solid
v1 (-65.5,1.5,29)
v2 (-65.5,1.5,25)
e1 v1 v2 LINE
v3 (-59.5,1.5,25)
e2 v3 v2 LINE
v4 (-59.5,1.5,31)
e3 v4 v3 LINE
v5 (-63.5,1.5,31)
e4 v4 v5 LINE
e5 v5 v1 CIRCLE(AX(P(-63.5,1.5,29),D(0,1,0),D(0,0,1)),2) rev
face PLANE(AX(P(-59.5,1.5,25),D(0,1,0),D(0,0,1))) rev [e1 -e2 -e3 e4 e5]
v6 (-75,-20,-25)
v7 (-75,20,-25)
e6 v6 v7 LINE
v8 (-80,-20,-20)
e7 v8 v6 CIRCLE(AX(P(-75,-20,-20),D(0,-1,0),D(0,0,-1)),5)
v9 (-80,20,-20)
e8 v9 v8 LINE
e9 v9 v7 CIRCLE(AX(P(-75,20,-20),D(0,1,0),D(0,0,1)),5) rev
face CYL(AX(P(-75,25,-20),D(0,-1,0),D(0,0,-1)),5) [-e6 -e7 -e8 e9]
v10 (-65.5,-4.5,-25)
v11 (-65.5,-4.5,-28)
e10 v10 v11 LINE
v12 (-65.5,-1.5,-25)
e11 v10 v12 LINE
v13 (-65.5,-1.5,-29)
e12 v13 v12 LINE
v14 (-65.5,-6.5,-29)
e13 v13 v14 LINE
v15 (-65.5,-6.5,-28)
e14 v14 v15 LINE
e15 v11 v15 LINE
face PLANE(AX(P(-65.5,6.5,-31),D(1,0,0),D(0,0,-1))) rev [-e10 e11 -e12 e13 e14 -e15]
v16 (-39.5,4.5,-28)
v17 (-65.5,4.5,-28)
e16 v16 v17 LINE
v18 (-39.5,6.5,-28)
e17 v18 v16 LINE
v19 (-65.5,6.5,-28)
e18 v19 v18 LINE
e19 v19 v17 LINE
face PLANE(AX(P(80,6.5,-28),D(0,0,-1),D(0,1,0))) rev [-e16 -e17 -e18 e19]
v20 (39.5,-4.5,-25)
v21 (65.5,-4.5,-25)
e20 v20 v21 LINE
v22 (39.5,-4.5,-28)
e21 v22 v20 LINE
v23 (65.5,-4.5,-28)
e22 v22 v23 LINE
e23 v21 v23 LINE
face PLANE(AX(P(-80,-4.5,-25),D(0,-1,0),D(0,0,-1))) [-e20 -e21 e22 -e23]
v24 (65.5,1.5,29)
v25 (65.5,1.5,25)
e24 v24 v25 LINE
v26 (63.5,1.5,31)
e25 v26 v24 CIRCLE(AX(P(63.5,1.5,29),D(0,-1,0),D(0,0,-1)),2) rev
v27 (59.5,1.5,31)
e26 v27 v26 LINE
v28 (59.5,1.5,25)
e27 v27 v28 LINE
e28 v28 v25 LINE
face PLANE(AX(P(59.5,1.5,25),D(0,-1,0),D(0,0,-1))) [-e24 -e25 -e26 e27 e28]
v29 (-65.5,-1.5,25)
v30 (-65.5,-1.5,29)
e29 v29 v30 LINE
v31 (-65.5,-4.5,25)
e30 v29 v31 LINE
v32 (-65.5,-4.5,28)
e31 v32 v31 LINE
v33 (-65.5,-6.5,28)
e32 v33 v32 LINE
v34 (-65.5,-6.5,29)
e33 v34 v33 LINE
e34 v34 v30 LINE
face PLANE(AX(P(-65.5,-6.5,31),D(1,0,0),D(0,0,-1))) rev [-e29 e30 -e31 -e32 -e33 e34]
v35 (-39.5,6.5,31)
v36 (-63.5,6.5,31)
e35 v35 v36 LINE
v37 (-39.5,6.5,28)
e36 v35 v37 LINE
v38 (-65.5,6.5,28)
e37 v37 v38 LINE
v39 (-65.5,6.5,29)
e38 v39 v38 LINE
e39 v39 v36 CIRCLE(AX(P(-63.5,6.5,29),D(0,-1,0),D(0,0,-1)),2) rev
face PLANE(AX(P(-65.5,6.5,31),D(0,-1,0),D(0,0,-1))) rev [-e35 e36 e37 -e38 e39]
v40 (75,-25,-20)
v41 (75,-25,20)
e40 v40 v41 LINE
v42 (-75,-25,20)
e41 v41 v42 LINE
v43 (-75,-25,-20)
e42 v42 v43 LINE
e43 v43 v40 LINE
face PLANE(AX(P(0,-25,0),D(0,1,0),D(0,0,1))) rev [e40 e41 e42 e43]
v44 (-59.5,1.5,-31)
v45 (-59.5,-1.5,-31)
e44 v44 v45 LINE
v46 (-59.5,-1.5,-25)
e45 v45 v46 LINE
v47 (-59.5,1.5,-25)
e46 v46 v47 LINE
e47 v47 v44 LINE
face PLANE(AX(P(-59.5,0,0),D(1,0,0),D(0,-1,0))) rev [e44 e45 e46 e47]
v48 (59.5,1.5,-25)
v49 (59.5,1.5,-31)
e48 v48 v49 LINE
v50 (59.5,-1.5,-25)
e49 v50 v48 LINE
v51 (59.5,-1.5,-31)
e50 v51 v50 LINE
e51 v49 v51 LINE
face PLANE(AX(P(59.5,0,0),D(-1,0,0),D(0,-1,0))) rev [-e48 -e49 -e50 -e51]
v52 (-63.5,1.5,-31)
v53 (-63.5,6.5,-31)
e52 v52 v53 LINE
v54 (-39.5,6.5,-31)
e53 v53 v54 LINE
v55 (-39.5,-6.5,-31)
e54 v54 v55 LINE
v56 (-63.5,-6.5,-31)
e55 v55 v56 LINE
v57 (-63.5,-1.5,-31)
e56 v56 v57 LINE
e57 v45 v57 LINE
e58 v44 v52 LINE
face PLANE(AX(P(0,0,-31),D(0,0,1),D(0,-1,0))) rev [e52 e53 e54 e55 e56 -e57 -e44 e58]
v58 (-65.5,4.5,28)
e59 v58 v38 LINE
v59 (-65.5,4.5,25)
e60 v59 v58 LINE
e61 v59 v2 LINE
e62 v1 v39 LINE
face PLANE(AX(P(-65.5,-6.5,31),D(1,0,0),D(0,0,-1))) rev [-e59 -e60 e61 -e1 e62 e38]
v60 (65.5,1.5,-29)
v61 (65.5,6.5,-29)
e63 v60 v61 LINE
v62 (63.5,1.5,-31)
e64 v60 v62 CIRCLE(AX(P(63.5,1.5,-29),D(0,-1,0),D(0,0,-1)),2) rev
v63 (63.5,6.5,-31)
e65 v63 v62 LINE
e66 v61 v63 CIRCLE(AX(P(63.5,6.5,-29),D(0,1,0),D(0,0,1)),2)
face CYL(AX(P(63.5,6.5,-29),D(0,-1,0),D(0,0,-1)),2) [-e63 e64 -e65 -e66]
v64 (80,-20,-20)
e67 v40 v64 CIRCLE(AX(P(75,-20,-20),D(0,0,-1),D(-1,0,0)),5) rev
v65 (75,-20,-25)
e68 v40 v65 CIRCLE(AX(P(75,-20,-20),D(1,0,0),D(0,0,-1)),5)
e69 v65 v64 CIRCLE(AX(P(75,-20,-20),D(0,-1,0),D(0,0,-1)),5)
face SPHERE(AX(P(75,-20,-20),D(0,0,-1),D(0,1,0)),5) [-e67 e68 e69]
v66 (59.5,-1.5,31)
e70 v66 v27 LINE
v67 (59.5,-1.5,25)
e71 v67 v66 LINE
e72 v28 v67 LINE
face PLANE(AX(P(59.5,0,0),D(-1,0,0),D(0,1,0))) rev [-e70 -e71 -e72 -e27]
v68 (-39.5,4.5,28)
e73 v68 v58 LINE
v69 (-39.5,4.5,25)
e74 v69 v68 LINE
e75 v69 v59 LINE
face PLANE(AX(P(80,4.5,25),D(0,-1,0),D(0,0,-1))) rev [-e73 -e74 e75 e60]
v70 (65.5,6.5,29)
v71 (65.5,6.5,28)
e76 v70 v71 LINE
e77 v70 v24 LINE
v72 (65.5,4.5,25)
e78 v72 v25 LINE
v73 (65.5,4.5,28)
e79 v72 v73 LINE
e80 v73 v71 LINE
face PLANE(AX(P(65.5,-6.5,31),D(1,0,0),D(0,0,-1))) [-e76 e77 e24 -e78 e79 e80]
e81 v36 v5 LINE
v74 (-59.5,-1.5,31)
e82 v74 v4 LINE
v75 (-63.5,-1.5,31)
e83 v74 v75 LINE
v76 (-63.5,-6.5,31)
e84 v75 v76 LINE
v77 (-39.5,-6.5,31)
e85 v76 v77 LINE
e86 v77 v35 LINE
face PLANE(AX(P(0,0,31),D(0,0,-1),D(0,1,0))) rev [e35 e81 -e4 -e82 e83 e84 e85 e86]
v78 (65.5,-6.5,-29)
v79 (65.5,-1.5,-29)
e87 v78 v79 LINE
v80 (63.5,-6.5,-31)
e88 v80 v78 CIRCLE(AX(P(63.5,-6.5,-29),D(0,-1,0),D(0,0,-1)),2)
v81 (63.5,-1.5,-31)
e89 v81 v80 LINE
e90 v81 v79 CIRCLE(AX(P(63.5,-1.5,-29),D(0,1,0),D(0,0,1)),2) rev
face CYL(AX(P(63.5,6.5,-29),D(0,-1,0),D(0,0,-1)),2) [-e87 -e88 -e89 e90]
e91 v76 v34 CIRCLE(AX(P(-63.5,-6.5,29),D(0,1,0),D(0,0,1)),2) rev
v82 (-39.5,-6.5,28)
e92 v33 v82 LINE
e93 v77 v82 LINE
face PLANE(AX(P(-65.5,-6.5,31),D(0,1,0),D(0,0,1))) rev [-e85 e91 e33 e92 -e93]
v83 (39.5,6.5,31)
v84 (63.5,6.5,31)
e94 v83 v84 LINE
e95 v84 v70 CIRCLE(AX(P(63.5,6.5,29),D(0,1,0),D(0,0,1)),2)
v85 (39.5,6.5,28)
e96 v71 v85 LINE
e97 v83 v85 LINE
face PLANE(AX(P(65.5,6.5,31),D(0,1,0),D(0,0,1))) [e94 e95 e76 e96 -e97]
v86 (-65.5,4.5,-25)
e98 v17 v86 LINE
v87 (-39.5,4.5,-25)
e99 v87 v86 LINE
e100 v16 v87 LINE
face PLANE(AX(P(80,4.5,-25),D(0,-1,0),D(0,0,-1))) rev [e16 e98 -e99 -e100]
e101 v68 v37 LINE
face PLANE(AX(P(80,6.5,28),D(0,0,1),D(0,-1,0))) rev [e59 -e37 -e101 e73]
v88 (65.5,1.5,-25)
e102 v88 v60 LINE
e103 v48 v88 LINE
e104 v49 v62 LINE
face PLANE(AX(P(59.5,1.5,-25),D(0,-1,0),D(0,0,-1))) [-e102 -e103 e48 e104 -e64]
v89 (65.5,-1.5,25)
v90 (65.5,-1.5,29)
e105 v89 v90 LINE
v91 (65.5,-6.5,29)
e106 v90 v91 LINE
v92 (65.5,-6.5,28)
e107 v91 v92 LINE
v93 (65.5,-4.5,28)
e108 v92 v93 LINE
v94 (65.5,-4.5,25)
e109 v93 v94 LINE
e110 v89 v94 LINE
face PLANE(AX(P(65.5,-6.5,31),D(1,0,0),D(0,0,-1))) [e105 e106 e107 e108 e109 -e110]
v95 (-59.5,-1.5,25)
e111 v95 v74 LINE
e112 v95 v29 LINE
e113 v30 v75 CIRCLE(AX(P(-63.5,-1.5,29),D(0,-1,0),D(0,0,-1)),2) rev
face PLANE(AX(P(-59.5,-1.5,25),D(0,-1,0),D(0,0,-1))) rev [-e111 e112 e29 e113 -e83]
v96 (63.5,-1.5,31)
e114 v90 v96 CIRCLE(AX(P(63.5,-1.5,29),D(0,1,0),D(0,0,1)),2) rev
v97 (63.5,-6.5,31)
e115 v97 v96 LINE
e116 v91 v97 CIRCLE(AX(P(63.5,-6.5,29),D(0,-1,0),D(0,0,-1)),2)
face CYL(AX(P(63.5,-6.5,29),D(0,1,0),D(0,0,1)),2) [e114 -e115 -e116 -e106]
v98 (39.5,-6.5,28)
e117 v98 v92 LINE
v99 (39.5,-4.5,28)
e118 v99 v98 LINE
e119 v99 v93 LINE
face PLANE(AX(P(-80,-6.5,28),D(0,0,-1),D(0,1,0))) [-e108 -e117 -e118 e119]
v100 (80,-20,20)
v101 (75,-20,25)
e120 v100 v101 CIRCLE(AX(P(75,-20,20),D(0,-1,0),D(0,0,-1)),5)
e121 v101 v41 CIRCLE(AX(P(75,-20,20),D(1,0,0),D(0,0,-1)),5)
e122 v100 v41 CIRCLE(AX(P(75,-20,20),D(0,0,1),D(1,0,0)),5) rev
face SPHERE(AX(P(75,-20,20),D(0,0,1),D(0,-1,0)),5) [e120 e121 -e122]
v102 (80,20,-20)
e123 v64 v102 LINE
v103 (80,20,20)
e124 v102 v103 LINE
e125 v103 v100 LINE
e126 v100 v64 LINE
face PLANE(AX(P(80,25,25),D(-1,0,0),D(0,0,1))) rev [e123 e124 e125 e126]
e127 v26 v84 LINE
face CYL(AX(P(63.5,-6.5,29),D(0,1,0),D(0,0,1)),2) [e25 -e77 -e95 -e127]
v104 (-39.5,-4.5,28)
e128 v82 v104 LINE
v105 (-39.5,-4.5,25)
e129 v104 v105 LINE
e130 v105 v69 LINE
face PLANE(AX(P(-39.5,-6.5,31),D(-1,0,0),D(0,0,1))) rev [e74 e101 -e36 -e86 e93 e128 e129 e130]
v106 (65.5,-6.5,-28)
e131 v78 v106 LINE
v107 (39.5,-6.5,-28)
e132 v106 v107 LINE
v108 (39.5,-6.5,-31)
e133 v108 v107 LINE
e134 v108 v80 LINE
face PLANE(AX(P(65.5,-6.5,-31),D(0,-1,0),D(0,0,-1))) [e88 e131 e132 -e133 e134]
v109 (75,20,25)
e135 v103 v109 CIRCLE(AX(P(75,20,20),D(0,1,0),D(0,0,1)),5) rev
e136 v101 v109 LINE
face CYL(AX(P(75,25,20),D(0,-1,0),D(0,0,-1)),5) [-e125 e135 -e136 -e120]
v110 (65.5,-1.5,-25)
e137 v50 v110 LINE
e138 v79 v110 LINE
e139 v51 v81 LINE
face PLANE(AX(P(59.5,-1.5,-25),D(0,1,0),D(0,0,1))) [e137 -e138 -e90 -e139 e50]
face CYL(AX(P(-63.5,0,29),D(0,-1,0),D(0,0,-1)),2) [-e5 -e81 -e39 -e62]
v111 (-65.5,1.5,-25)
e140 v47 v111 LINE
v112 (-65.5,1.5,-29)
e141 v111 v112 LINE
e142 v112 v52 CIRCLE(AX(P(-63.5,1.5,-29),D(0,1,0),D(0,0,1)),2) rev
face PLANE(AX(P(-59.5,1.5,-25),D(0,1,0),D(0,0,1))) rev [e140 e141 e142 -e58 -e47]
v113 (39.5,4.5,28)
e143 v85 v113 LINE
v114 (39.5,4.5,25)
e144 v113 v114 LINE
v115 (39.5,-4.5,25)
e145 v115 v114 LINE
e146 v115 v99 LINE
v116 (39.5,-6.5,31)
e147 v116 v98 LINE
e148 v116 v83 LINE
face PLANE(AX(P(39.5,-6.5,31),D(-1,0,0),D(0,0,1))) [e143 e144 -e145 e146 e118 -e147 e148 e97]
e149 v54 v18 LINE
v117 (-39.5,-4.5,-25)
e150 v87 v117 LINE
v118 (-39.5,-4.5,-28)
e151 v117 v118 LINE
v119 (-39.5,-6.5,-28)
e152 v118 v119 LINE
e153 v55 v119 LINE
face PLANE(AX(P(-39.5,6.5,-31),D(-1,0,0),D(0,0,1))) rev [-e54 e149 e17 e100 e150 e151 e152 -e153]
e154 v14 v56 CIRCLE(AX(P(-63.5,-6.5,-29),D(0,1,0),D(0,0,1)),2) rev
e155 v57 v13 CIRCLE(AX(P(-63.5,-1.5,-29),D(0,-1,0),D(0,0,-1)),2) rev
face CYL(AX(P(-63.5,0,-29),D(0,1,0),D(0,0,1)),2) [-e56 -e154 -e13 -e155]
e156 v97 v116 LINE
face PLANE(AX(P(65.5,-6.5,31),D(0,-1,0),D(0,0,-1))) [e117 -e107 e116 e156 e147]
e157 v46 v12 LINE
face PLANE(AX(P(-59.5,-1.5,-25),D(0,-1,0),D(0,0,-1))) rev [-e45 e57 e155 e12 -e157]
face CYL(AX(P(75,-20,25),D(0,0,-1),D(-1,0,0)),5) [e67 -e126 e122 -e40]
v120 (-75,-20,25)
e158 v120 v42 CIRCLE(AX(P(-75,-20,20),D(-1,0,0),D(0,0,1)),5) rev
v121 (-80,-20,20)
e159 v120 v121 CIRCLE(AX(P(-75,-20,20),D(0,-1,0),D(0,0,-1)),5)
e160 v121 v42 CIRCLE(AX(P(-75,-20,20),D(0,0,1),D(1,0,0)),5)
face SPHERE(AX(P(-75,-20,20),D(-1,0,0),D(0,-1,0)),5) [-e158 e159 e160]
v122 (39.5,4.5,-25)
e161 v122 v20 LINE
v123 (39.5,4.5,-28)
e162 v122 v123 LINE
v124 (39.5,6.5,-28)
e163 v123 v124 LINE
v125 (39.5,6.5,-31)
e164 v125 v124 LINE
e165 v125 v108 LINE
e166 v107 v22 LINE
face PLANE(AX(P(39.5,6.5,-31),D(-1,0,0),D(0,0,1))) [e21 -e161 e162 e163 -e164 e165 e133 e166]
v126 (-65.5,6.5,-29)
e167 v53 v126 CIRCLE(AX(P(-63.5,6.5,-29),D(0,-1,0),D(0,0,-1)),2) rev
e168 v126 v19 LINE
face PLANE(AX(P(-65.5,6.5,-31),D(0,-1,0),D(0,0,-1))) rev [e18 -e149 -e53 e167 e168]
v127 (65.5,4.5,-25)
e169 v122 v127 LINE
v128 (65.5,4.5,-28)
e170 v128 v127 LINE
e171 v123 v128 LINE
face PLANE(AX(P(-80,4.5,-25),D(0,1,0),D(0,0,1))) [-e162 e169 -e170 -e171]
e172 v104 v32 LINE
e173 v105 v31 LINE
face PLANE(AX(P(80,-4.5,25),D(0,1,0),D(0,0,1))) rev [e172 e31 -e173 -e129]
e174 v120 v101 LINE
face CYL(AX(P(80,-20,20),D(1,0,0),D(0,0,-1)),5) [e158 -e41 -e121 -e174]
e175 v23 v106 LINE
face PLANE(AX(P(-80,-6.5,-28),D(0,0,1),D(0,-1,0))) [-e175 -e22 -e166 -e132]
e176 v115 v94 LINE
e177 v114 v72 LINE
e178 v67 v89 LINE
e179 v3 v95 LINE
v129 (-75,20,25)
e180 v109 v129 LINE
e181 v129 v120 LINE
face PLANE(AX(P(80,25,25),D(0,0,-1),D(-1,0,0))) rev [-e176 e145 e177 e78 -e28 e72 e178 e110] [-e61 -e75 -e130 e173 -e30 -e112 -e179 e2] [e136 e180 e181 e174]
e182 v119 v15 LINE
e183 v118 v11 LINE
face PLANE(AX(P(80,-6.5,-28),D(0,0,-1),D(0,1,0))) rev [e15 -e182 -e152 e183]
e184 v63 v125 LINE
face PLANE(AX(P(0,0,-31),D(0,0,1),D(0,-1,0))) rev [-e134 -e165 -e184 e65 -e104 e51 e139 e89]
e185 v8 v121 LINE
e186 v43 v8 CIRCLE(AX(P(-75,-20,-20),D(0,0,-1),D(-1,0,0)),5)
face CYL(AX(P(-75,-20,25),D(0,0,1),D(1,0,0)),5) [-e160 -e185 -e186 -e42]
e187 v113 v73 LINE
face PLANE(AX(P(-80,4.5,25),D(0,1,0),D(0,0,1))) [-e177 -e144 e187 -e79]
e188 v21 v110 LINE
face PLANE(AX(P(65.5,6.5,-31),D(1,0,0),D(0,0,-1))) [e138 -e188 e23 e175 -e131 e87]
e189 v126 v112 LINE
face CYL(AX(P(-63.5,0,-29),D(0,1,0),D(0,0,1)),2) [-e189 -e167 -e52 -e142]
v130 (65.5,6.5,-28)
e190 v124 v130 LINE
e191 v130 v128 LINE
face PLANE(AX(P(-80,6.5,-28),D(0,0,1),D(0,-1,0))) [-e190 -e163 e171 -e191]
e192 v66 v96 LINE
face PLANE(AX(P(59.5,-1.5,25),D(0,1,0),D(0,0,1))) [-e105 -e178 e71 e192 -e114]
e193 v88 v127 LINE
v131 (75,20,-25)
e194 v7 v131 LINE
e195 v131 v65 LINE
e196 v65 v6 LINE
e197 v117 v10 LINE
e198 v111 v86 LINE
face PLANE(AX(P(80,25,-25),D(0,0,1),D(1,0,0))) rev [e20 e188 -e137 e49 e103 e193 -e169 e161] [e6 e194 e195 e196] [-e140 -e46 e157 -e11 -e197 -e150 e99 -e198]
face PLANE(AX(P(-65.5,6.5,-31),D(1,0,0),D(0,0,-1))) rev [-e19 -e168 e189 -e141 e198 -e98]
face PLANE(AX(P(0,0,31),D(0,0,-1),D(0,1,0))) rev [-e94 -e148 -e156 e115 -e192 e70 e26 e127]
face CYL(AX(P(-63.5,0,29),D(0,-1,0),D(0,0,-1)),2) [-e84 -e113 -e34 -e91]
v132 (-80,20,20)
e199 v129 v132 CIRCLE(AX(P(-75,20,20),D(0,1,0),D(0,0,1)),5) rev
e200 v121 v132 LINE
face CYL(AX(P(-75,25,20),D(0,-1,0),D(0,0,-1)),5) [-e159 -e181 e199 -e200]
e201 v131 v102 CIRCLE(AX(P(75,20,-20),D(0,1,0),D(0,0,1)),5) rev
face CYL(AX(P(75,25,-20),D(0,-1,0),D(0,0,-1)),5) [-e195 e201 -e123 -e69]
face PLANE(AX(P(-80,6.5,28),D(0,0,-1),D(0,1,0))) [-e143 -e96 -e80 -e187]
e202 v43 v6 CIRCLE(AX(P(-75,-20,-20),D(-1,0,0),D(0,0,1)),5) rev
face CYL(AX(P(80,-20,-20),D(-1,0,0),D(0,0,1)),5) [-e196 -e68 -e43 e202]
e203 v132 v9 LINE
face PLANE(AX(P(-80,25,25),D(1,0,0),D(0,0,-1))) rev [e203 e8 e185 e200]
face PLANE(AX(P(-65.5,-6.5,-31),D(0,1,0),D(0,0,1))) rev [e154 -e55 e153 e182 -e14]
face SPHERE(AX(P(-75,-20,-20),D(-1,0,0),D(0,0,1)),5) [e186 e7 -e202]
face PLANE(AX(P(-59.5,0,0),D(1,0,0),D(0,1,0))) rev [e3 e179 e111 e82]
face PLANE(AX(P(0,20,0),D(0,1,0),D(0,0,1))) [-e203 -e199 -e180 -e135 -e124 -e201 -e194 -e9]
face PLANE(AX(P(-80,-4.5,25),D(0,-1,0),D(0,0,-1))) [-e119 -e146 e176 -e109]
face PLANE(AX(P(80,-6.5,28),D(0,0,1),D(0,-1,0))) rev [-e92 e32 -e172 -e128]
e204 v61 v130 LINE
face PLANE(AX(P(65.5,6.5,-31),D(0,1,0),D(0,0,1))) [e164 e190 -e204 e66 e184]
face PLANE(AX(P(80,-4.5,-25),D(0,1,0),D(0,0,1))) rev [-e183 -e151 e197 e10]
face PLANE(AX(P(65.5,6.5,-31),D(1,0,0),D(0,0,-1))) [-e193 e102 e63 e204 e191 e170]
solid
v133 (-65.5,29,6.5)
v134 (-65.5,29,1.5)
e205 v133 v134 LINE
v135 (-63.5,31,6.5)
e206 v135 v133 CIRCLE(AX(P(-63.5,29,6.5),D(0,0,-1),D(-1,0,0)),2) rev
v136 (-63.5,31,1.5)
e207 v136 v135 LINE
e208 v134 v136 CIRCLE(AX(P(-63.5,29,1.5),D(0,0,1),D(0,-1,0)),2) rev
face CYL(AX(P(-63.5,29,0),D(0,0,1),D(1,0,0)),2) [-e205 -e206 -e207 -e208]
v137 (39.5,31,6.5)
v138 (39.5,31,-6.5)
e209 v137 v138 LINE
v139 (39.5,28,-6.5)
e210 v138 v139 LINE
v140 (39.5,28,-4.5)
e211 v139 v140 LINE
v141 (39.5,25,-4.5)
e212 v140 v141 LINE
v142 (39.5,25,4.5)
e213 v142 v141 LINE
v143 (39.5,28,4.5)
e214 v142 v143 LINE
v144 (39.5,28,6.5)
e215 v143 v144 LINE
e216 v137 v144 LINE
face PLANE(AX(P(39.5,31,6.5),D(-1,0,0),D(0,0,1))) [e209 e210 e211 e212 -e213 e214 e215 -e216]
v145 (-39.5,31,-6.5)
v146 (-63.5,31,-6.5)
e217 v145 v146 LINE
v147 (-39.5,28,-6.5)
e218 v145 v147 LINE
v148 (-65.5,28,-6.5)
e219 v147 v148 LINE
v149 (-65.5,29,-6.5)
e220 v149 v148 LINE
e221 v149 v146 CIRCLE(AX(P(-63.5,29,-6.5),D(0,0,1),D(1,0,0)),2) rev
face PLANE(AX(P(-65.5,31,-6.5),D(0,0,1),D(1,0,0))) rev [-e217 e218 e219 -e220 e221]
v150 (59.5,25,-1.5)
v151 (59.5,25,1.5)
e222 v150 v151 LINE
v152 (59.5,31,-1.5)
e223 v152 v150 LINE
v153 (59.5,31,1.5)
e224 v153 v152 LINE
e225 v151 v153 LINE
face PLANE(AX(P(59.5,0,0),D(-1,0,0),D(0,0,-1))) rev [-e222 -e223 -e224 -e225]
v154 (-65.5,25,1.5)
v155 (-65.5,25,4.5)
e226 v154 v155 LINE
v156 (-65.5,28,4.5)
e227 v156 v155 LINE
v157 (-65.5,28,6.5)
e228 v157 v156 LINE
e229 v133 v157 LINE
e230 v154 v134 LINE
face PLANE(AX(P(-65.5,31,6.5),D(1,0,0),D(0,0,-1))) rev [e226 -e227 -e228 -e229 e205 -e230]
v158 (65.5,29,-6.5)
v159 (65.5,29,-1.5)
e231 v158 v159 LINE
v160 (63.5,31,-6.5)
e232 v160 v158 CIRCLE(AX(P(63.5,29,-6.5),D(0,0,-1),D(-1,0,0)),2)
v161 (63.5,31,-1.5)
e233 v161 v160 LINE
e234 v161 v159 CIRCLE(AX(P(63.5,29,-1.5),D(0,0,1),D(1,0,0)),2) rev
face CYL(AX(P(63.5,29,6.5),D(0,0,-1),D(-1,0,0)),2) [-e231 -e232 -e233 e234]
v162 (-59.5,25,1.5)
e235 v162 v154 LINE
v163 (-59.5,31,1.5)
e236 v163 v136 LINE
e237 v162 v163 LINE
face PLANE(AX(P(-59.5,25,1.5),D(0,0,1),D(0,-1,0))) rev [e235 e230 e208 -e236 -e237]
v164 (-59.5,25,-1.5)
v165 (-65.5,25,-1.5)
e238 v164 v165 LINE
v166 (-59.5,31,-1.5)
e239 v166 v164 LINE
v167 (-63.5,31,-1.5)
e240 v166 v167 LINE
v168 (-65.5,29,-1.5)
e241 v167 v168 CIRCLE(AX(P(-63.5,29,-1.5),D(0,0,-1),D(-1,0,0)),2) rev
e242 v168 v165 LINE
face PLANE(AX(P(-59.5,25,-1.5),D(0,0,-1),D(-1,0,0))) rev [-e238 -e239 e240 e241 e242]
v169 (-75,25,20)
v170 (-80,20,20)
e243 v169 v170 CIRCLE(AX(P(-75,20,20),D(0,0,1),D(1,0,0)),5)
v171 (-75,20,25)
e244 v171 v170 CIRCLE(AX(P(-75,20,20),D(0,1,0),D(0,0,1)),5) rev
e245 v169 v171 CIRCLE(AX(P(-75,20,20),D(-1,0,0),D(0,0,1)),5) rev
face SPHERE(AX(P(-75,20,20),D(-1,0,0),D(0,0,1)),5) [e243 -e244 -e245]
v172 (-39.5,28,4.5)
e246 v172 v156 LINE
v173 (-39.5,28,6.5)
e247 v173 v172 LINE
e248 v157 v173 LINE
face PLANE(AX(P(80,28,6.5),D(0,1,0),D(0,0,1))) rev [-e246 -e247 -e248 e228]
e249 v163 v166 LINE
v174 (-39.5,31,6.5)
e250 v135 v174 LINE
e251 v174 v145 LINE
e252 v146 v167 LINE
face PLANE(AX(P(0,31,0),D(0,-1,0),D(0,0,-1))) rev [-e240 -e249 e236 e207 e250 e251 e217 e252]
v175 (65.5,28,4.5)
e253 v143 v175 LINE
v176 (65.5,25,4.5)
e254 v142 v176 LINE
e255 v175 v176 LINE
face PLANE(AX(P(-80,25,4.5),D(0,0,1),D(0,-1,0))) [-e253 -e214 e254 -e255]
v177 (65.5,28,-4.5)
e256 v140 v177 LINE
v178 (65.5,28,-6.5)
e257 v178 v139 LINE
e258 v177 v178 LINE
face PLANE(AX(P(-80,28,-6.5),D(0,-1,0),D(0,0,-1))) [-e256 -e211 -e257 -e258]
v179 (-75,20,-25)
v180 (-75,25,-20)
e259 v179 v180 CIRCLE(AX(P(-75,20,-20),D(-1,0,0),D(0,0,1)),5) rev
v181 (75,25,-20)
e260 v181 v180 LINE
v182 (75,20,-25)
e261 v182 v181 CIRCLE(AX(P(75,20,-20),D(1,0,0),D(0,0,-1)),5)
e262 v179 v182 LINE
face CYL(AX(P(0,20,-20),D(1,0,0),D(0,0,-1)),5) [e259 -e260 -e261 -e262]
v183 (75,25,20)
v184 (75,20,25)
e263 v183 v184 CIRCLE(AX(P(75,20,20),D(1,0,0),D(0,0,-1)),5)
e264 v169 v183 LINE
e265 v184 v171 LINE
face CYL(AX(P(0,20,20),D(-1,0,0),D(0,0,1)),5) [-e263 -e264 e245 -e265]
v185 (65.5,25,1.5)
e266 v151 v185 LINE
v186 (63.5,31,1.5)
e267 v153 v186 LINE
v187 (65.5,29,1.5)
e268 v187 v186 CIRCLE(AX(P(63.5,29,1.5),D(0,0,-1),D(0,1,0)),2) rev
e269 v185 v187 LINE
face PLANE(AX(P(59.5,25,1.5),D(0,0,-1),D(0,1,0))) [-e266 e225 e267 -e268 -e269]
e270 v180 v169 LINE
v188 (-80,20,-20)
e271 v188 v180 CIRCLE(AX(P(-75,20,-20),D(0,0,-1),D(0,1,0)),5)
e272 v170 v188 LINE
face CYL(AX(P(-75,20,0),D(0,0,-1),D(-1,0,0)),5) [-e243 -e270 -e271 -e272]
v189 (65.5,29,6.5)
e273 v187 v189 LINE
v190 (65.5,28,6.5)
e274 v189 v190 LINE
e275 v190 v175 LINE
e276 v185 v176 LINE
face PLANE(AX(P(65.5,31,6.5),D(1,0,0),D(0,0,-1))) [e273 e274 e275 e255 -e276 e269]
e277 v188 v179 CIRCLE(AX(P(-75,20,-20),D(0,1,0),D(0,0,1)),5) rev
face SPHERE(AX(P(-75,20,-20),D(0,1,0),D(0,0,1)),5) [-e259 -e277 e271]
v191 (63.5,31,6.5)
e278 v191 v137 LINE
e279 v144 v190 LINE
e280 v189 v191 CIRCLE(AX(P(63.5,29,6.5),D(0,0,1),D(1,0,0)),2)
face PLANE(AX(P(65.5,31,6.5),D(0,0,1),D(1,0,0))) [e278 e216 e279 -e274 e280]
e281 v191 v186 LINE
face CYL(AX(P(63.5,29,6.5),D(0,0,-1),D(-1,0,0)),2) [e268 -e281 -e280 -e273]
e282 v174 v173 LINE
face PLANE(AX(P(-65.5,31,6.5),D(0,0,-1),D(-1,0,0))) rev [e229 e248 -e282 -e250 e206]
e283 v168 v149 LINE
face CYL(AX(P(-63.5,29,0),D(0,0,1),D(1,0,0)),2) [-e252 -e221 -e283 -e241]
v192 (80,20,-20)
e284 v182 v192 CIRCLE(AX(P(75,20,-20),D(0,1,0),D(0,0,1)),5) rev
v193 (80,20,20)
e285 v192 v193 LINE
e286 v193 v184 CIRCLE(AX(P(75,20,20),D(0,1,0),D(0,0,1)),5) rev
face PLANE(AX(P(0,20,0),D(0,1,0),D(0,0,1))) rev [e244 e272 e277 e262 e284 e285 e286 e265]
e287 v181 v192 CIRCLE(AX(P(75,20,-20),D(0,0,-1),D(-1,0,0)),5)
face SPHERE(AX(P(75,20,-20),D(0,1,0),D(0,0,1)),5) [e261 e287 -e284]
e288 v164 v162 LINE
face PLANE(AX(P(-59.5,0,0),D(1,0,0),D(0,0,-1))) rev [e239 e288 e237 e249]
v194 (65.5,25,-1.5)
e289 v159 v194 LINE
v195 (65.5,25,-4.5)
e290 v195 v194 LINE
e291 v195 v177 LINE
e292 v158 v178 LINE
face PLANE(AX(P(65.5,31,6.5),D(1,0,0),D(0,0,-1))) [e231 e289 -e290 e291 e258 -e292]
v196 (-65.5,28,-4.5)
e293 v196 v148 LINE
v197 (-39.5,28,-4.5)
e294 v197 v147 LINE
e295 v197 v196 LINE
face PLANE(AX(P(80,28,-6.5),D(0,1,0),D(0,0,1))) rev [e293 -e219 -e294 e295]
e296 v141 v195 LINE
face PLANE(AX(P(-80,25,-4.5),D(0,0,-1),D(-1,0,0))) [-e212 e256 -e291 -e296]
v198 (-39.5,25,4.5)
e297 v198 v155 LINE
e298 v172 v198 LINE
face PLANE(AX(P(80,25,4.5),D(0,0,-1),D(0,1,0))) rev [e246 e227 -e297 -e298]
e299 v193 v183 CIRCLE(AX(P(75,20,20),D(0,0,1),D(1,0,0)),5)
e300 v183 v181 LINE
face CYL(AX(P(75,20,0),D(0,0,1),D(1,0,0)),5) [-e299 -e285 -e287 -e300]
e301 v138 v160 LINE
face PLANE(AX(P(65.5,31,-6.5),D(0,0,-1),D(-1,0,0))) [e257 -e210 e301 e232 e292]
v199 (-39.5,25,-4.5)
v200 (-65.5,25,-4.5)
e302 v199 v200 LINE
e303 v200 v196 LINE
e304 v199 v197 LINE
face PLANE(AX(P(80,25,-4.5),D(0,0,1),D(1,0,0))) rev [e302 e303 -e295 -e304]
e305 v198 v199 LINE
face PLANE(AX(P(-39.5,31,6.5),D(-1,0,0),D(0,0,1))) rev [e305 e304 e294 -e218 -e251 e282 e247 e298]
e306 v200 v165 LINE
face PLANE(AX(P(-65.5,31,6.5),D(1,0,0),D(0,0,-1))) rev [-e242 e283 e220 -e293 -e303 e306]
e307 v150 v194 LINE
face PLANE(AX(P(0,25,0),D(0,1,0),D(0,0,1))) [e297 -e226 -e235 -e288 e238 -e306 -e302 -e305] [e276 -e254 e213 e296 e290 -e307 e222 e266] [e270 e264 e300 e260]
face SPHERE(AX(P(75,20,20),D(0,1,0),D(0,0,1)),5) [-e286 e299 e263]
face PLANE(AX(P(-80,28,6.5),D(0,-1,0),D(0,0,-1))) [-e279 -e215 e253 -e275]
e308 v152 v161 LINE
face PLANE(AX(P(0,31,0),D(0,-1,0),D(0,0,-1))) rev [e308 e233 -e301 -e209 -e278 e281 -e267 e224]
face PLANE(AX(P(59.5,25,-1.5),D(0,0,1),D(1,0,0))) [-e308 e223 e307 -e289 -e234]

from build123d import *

# Parameters (mm, degrees)
SKETCH1_W               = 160
SKETCH1_H               = 50
BOSS_EXTRUDE1_DEPTH     = 25
SKETCH2_W               = 26
SKETCH2_H               = 13
CONNECTOR_BASE_DEPTH    = 6
SKETCH3_W               = 2
SKETCH3_H               = 3
DOVETAIL_CUT_DEPTH      = 151.851748415
FILLET1_R               = 2
SKETCH4_W               = 3
SKETCH4_H               = 6
CUT_EXTRUDE1_DEPTH      = 6
CIRPATTERN1_START       = -4.5
CIRPATTERN1_OUTLINE_W   = 20
CIRPATTERN1_OUTLINE_H   = 6
CIRPATTERN1_DEPTH       = 9
CIRPATTERN1_START_2     = -6.5
CIRPATTERN1_2_OUTLINE_W = 20
CIRPATTERN1_2_OUTLINE_H = 3
CIRPATTERN1_2_DEPTH     = 13
CIRPATTERN1_3_DEPTH     = 3
CIRPATTERN1_START_3     = 1.5
CIRPATTERN1_4_DEPTH     = 3
CIRPATTERN1_5_DEPTH     = 2
CIRPATTERN1_START_4     = 4.5
CIRPATTERN1_6_DEPTH     = 2
CIRPATTERN1_7_OUTLINE_W = 20
CIRPATTERN1_7_OUTLINE_H = 6
CIRPATTERN1_7_DEPTH     = 9
CIRPATTERN1_8_OUTLINE_W = 20
CIRPATTERN1_8_OUTLINE_H = 3
CIRPATTERN1_8_DEPTH     = 13
CIRPATTERN1_9_DEPTH     = 3
CIRPATTERN1_10_DEPTH    = 3
CIRPATTERN1_11_DEPTH    = 2
CIRPATTERN1_12_DEPTH    = 2
MIRROR1_START           = -4.5
MIRROR1_OUTLINE_W       = 20
MIRROR1_OUTLINE_H       = 6
MIRROR1_DEPTH           = 9
MIRROR1_START_2         = -6.5
MIRROR1_2_OUTLINE_W     = 20
MIRROR1_2_OUTLINE_H     = 3
MIRROR1_2_DEPTH         = 13
MIRROR1_3_DEPTH         = 3
MIRROR1_START_3         = 1.5
MIRROR1_4_DEPTH         = 3
MIRROR1_5_DEPTH         = 2
MIRROR1_START_4         = 4.5
MIRROR1_6_DEPTH         = 2
MIRROR1_7_OUTLINE_W     = 20
MIRROR1_7_OUTLINE_H     = 6
MIRROR1_7_DEPTH         = 9
MIRROR1_8_OUTLINE_W     = 20
MIRROR1_8_OUTLINE_H     = 3
MIRROR1_8_DEPTH         = 13
MIRROR1_9_DEPTH         = 3
MIRROR1_10_DEPTH        = 3
MIRROR1_11_DEPTH        = 2
MIRROR1_12_DEPTH        = 2
FILLET2_R               = 5
SKETCH5_W               = 150
SKETCH5_H               = 40
CUT_EXTRUDE2_DEPTH      = 6


# Read off the part's stored shape, not the designer's step: CirPattern1, Mirror1
with BuildPart() as part:
    # Sketch1 → Boss-Extrude1 (new, symmetric)
    with BuildSketch(Plane(origin=(0, 0, 0), x_dir=(1, 0, 0), z_dir=(0, 1, 0))):
        Rectangle(SKETCH1_W, SKETCH1_H)
    extrude(amount=BOSS_EXTRUDE1_DEPTH, both=True)

    # Sketch2 → connector base (add)
    with BuildSketch(Plane(origin=(0, 25, 0), x_dir=(1, 0, 0), z_dir=(0, 1, 0))):
        with Locations((-52.5, 0)):
            Rectangle(SKETCH2_W, SKETCH2_H)
    extrude(amount=CONNECTOR_BASE_DEPTH)

    # Sketch3 → dovetail cut (cut, through all)
    with BuildSketch(Plane.ZY.offset(65.5)):
        with Locations((5.5, 26.5)):
            Rectangle(SKETCH3_W, SKETCH3_H)
        with Locations((-5.5, 26.5)):
            Rectangle(SKETCH3_W, SKETCH3_H)
    extrude(amount=-DOVETAIL_CUT_DEPTH, mode=Mode.SUBTRACT)

    # Fillet1
    fillet1_edges = [part.edges().sort_by_distance(p)[0] for p in [
        (-65.5, 31, 0),
    ]]
    fillet(fillet1_edges, radius=FILLET1_R)

    # Sketch4 → Cut-Extrude1 (cut)
    with BuildSketch(Plane.ZY.offset(65.5)):
        with Locations((0, 28)):
            Rectangle(SKETCH4_W, SKETCH4_H)
    extrude(amount=-CUT_EXTRUDE1_DEPTH, mode=Mode.SUBTRACT)

    # CirPattern1 outline → CirPattern1 (add)
    with BuildSketch(Plane(origin=(0, 0, 0), x_dir=(1, 0, 0), z_dir=(0, 1, 0)).offset(CIRPATTERN1_START)):
        with Locations((-49.5, 28)):
            Rectangle(CIRPATTERN1_OUTLINE_W, CIRPATTERN1_OUTLINE_H)
        with Locations((-49.5, -28)):
            Rectangle(CIRPATTERN1_OUTLINE_W, CIRPATTERN1_OUTLINE_H)
    extrude(amount=CIRPATTERN1_DEPTH)

    # CirPattern1 2 outline → CirPattern1 2 (add)
    with BuildSketch(Plane(origin=(0, 0, 0), x_dir=(1, 0, 0), z_dir=(0, 1, 0)).offset(CIRPATTERN1_START_2)):
        with Locations((-49.5, 29.5)):
            Rectangle(CIRPATTERN1_2_OUTLINE_W, CIRPATTERN1_2_OUTLINE_H)
        with Locations((-49.5, -29.5)):
            Rectangle(CIRPATTERN1_2_OUTLINE_W, CIRPATTERN1_2_OUTLINE_H)
    extrude(amount=CIRPATTERN1_2_DEPTH)

    # CirPattern1 3 outline → CirPattern1 3 (add)
    with BuildSketch(Plane(origin=(0, 0, 0), x_dir=(1, 0, 0), z_dir=(0, 1, 0)).offset(CIRPATTERN1_START)):
        with BuildLine():
            Line((-65.5, 25), (-59.5, 25))
            Line((-59.5, 25), (-59.5, 31))
            Line((-59.5, 31), (-63.5, 31))
            ThreePointArc((-63.5, 31), (-64.914213562, 30.414213562), (-65.5, 29))
            Line((-65.5, 29), (-65.5, 25))
        make_face()
        with BuildLine():
            ThreePointArc((-65.5, -29), (-64.914213562, -30.414213562), (-63.5, -31))
            Line((-63.5, -31), (-59.5, -31))
            Line((-59.5, -31), (-59.5, -25))
            Line((-59.5, -25), (-65.5, -25))
            Line((-65.5, -25), (-65.5, -29))
        make_face()
    extrude(amount=CIRPATTERN1_3_DEPTH)

    # CirPattern1 4 outline → CirPattern1 4 (add)
    with BuildSketch(Plane(origin=(0, 0, 0), x_dir=(1, 0, 0), z_dir=(0, 1, 0)).offset(CIRPATTERN1_START_3)):
        with BuildLine():
            Line((-65.5, 25), (-59.5, 25))
            Line((-59.5, 25), (-59.5, 31))
            Line((-59.5, 31), (-63.5, 31))
            ThreePointArc((-63.5, 31), (-64.914213562, 30.414213562), (-65.5, 29))
            Line((-65.5, 29), (-65.5, 25))
        make_face()
        with BuildLine():
            ThreePointArc((-65.5, -29), (-64.914213562, -30.414213562), (-63.5, -31))
            Line((-63.5, -31), (-59.5, -31))
            Line((-59.5, -31), (-59.5, -25))
            Line((-59.5, -25), (-65.5, -25))
            Line((-65.5, -25), (-65.5, -29))
        make_face()
    extrude(amount=CIRPATTERN1_4_DEPTH)

    # CirPattern1 5 outline → CirPattern1 5 (add)
    with BuildSketch(Plane(origin=(0, 0, 0), x_dir=(1, 0, 0), z_dir=(0, 1, 0)).offset(CIRPATTERN1_START_2)):
        with BuildLine():
            Line((-65.5, 29), (-65.5, 28))
            Line((-65.5, 28), (-59.5, 28))
            Line((-59.5, 28), (-59.5, 31))
            Line((-59.5, 31), (-63.5, 31))
            ThreePointArc((-63.5, 31), (-64.914213562, 30.414213562), (-65.5, 29))
        make_face()
        with BuildLine():
            Line((-65.5, -28), (-65.5, -29))
            ThreePointArc((-65.5, -29), (-64.914213562, -30.414213562), (-63.5, -31))
            Line((-63.5, -31), (-59.5, -31))
            Line((-59.5, -31), (-59.5, -28))
            Line((-59.5, -28), (-65.5, -28))
        make_face()
    extrude(amount=CIRPATTERN1_5_DEPTH)

    # CirPattern1 6 outline → CirPattern1 6 (add)
    with BuildSketch(Plane(origin=(0, 0, 0), x_dir=(1, 0, 0), z_dir=(0, 1, 0)).offset(CIRPATTERN1_START_4)):
        with BuildLine():
            Line((-65.5, 29), (-65.5, 28))
            Line((-65.5, 28), (-59.5, 28))
            Line((-59.5, 28), (-59.5, 31))
            Line((-59.5, 31), (-63.5, 31))
            ThreePointArc((-63.5, 31), (-64.914213562, 30.414213562), (-65.5, 29))
        make_face()
        with BuildLine():
            Line((-65.5, -28), (-65.5, -29))
            ThreePointArc((-65.5, -29), (-64.914213562, -30.414213562), (-63.5, -31))
            Line((-63.5, -31), (-59.5, -31))
            Line((-59.5, -31), (-59.5, -28))
            Line((-59.5, -28), (-65.5, -28))
        make_face()
    extrude(amount=CIRPATTERN1_6_DEPTH)

    # CirPattern1 7 outline → CirPattern1 7 (add)
    with BuildSketch(Plane.XY.offset(CIRPATTERN1_START)):
        with Locations((-49.5, -28)):
            Rectangle(CIRPATTERN1_7_OUTLINE_W, CIRPATTERN1_7_OUTLINE_H)
    extrude(amount=CIRPATTERN1_7_DEPTH)

    # CirPattern1 8 outline → CirPattern1 8 (add)
    with BuildSketch(Plane.XY.offset(CIRPATTERN1_START_2)):
        with Locations((-49.5, -29.5)):
            Rectangle(CIRPATTERN1_8_OUTLINE_W, CIRPATTERN1_8_OUTLINE_H)
    extrude(amount=CIRPATTERN1_8_DEPTH)

    # CirPattern1 9 outline → CirPattern1 9 (add)
    with BuildSketch(Plane.XY.offset(CIRPATTERN1_START)):
        with BuildLine():
            ThreePointArc((-65.5, -29), (-64.914213562, -30.414213562), (-63.5, -31))
            Line((-63.5, -31), (-59.5, -31))
            Line((-59.5, -31), (-59.5, -25))
            Line((-59.5, -25), (-65.5, -25))
            Line((-65.5, -25), (-65.5, -29))
        make_face()
    extrude(amount=CIRPATTERN1_9_DEPTH)

    # CirPattern1 10 outline → CirPattern1 10 (add)
    with BuildSketch(Plane.XY.offset(CIRPATTERN1_START_3)):
        with BuildLine():
            ThreePointArc((-65.5, -29), (-64.914213562, -30.414213562), (-63.5, -31))
            Line((-63.5, -31), (-59.5, -31))
            Line((-59.5, -31), (-59.5, -25))
            Line((-59.5, -25), (-65.5, -25))
            Line((-65.5, -25), (-65.5, -29))
        make_face()
    extrude(amount=CIRPATTERN1_10_DEPTH)

    # CirPattern1 11 outline → CirPattern1 11 (add)
    with BuildSketch(Plane.XY.offset(CIRPATTERN1_START_2)):
        with BuildLine():
            Line((-65.5, -28), (-65.5, -29))
            ThreePointArc((-65.5, -29), (-64.914213562, -30.414213562), (-63.5, -31))
            Line((-63.5, -31), (-59.5, -31))
            Line((-59.5, -31), (-59.5, -28))
            Line((-59.5, -28), (-65.5, -28))
        make_face()
    extrude(amount=CIRPATTERN1_11_DEPTH)

    # CirPattern1 12 outline → CirPattern1 12 (add)
    with BuildSketch(Plane.XY.offset(CIRPATTERN1_START_4)):
        with BuildLine():
            Line((-65.5, -28), (-65.5, -29))
            ThreePointArc((-65.5, -29), (-64.914213562, -30.414213562), (-63.5, -31))
            Line((-63.5, -31), (-59.5, -31))
            Line((-59.5, -31), (-59.5, -28))
            Line((-59.5, -28), (-65.5, -28))
        make_face()
    extrude(amount=CIRPATTERN1_12_DEPTH)

    # Mirror1 outline → Mirror1 (add)
    with BuildSketch(Plane.XY.offset(MIRROR1_START)):
        with Locations((49.5, 28)):
            Rectangle(MIRROR1_OUTLINE_W, MIRROR1_OUTLINE_H)
        with Locations((49.5, -28)):
            Rectangle(MIRROR1_OUTLINE_W, MIRROR1_OUTLINE_H)
    extrude(amount=MIRROR1_DEPTH)

    # Mirror1 2 outline → Mirror1 2 (add)
    with BuildSketch(Plane.XY.offset(MIRROR1_START_2)):
        with Locations((49.5, 29.5)):
            Rectangle(MIRROR1_2_OUTLINE_W, MIRROR1_2_OUTLINE_H)
        with Locations((49.5, -29.5)):
            Rectangle(MIRROR1_2_OUTLINE_W, MIRROR1_2_OUTLINE_H)
    extrude(amount=MIRROR1_2_DEPTH)

    # Mirror1 3 outline → Mirror1 3 (add)
    with BuildSketch(Plane.XY.offset(MIRROR1_START)):
        with BuildLine():
            Line((59.5, 25), (65.5, 25))
            Line((65.5, 25), (65.5, 29))
            ThreePointArc((65.5, 29), (64.914213562, 30.414213562), (63.5, 31))
            Line((63.5, 31), (59.5, 31))
            Line((59.5, 31), (59.5, 25))
        make_face()
        with BuildLine():
            ThreePointArc((63.5, -31), (64.914213562, -30.414213562), (65.5, -29))
            Line((65.5, -29), (65.5, -25))
            Line((65.5, -25), (59.5, -25))
            Line((59.5, -25), (59.5, -31))
            Line((59.5, -31), (63.5, -31))
        make_face()
    extrude(amount=MIRROR1_3_DEPTH)

    # Mirror1 4 outline → Mirror1 4 (add)
    with BuildSketch(Plane.XY.offset(MIRROR1_START_3)):
        with BuildLine():
            Line((59.5, 25), (65.5, 25))
            Line((65.5, 25), (65.5, 29))
            ThreePointArc((65.5, 29), (64.914213562, 30.414213562), (63.5, 31))
            Line((63.5, 31), (59.5, 31))
            Line((59.5, 31), (59.5, 25))
        make_face()
        with BuildLine():
            ThreePointArc((63.5, -31), (64.914213562, -30.414213562), (65.5, -29))
            Line((65.5, -29), (65.5, -25))
            Line((65.5, -25), (59.5, -25))
            Line((59.5, -25), (59.5, -31))
            Line((59.5, -31), (63.5, -31))
        make_face()
    extrude(amount=MIRROR1_4_DEPTH)

    # Mirror1 5 outline → Mirror1 5 (add)
    with BuildSketch(Plane.XY.offset(MIRROR1_START_2)):
        with BuildLine():
            Line((59.5, 28), (65.5, 28))
            Line((65.5, 28), (65.5, 29))
            ThreePointArc((65.5, 29), (64.914213562, 30.414213562), (63.5, 31))
            Line((63.5, 31), (59.5, 31))
            Line((59.5, 31), (59.5, 28))
        make_face()
        with BuildLine():
            ThreePointArc((63.5, -31), (64.914213562, -30.414213562), (65.5, -29))
            Line((65.5, -29), (65.5, -28))
            Line((65.5, -28), (59.5, -28))
            Line((59.5, -28), (59.5, -31))
            Line((59.5, -31), (63.5, -31))
        make_face()
    extrude(amount=MIRROR1_5_DEPTH)

    # Mirror1 6 outline → Mirror1 6 (add)
    with BuildSketch(Plane.XY.offset(MIRROR1_START_4)):
        with BuildLine():
            Line((59.5, 28), (65.5, 28))
            Line((65.5, 28), (65.5, 29))
            ThreePointArc((65.5, 29), (64.914213562, 30.414213562), (63.5, 31))
            Line((63.5, 31), (59.5, 31))
            Line((59.5, 31), (59.5, 28))
        make_face()
        with BuildLine():
            ThreePointArc((63.5, -31), (64.914213562, -30.414213562), (65.5, -29))
            Line((65.5, -29), (65.5, -28))
            Line((65.5, -28), (59.5, -28))
            Line((59.5, -28), (59.5, -31))
            Line((59.5, -31), (63.5, -31))
        make_face()
    extrude(amount=MIRROR1_6_DEPTH)

    # Mirror1 7 outline → Mirror1 7 (add)
    with BuildSketch(Plane(origin=(0, 0, 0), x_dir=(1, 0, 0), z_dir=(0, 1, 0)).offset(MIRROR1_START)):
        with Locations((49.5, 28)):
            Rectangle(MIRROR1_7_OUTLINE_W, MIRROR1_7_OUTLINE_H)
        with Locations((49.5, -28)):
            Rectangle(MIRROR1_7_OUTLINE_W, MIRROR1_7_OUTLINE_H)
    extrude(amount=MIRROR1_7_DEPTH)

    # Mirror1 8 outline → Mirror1 8 (add)
    with BuildSketch(Plane(origin=(0, 0, 0), x_dir=(1, 0, 0), z_dir=(0, 1, 0)).offset(MIRROR1_START_2)):
        with Locations((49.5, 29.5)):
            Rectangle(MIRROR1_8_OUTLINE_W, MIRROR1_8_OUTLINE_H)
        with Locations((49.5, -29.5)):
            Rectangle(MIRROR1_8_OUTLINE_W, MIRROR1_8_OUTLINE_H)
    extrude(amount=MIRROR1_8_DEPTH)

    # Mirror1 9 outline → Mirror1 9 (add)
    with BuildSketch(Plane(origin=(0, 0, 0), x_dir=(1, 0, 0), z_dir=(0, 1, 0)).offset(MIRROR1_START)):
        with BuildLine():
            Line((59.5, 25), (65.5, 25))
            Line((65.5, 25), (65.5, 29))
            ThreePointArc((65.5, 29), (64.914213562, 30.414213562), (63.5, 31))
            Line((63.5, 31), (59.5, 31))
            Line((59.5, 31), (59.5, 25))
        make_face()
        with BuildLine():
            ThreePointArc((63.5, -31), (64.914213562, -30.414213562), (65.5, -29))
            Line((65.5, -29), (65.5, -25))
            Line((65.5, -25), (59.5, -25))
            Line((59.5, -25), (59.5, -31))
            Line((59.5, -31), (63.5, -31))
        make_face()
    extrude(amount=MIRROR1_9_DEPTH)

    # Mirror1 10 outline → Mirror1 10 (add)
    with BuildSketch(Plane(origin=(0, 0, 0), x_dir=(1, 0, 0), z_dir=(0, 1, 0)).offset(MIRROR1_START_3)):
        with BuildLine():
            Line((59.5, 25), (65.5, 25))
            Line((65.5, 25), (65.5, 29))
            ThreePointArc((65.5, 29), (64.914213562, 30.414213562), (63.5, 31))
            Line((63.5, 31), (59.5, 31))
            Line((59.5, 31), (59.5, 25))
        make_face()
        with BuildLine():
            ThreePointArc((63.5, -31), (64.914213562, -30.414213562), (65.5, -29))
            Line((65.5, -29), (65.5, -25))
            Line((65.5, -25), (59.5, -25))
            Line((59.5, -25), (59.5, -31))
            Line((59.5, -31), (63.5, -31))
        make_face()
    extrude(amount=MIRROR1_10_DEPTH)

    # Mirror1 11 outline → Mirror1 11 (add)
    with BuildSketch(Plane(origin=(0, 0, 0), x_dir=(1, 0, 0), z_dir=(0, 1, 0)).offset(MIRROR1_START_2)):
        with BuildLine():
            Line((59.5, 28), (65.5, 28))
            Line((65.5, 28), (65.5, 29))
            ThreePointArc((65.5, 29), (64.914213562, 30.414213562), (63.5, 31))
            Line((63.5, 31), (59.5, 31))
            Line((59.5, 31), (59.5, 28))
        make_face()
        with BuildLine():
            ThreePointArc((63.5, -31), (64.914213562, -30.414213562), (65.5, -29))
            Line((65.5, -29), (65.5, -28))
            Line((65.5, -28), (59.5, -28))
            Line((59.5, -28), (59.5, -31))
            Line((59.5, -31), (63.5, -31))
        make_face()
    extrude(amount=MIRROR1_11_DEPTH)

    # Mirror1 12 outline → Mirror1 12 (add)
    with BuildSketch(Plane(origin=(0, 0, 0), x_dir=(1, 0, 0), z_dir=(0, 1, 0)).offset(MIRROR1_START_4)):
        with BuildLine():
            Line((59.5, 28), (65.5, 28))
            Line((65.5, 28), (65.5, 29))
            ThreePointArc((65.5, 29), (64.914213562, 30.414213562), (63.5, 31))
            Line((63.5, 31), (59.5, 31))
            Line((59.5, 31), (59.5, 28))
        make_face()
        with BuildLine():
            ThreePointArc((63.5, -31), (64.914213562, -30.414213562), (65.5, -29))
            Line((65.5, -29), (65.5, -28))
            Line((65.5, -28), (59.5, -28))
            Line((59.5, -28), (59.5, -31))
            Line((59.5, -31), (63.5, -31))
        make_face()
    extrude(amount=MIRROR1_12_DEPTH)

    # Fillet2
    fillet2_edges = [part.edges().sort_by_distance(p)[0] for p in [
        (80, 25, 0),
        (0, 25, -25),
        (-80, 25, 0),
        (0, -25, -25),
        (80, -25, 0),
        (0, -25, 25),
        (-80, -25, 0),
        (-80, 0, -25),
        (80, 0, -25),
        (80, 0, 25),
        (-80, 0, 25),
        (0, 25, 25),
    ]]
    fillet(fillet2_edges, radius=FILLET2_R)

    # Sketch5 → Cut-Extrude2 (cut)
    with BuildSketch(Plane(origin=(0, -31, 0), x_dir=(-1, 0, 0), z_dir=(0, -1, 0))):
        Rectangle(SKETCH5_W, SKETCH5_H)
    extrude(amount=-CUT_EXTRUDE2_DEPTH, mode=Mode.SUBTRACT)


with BuildPart() as body_2:
    # Split1: the piece on the far side of the plane
    add(part.part)
    split(bisect_by=Plane.ZX.offset(20), keep=Keep.BOTTOM)


with BuildPart() as part_1:
    add(part.part)

    # Split1
    split(bisect_by=Plane.ZX.offset(20), keep=Keep.TOP)


solid = Compound([body_2.part, part_1.part])
